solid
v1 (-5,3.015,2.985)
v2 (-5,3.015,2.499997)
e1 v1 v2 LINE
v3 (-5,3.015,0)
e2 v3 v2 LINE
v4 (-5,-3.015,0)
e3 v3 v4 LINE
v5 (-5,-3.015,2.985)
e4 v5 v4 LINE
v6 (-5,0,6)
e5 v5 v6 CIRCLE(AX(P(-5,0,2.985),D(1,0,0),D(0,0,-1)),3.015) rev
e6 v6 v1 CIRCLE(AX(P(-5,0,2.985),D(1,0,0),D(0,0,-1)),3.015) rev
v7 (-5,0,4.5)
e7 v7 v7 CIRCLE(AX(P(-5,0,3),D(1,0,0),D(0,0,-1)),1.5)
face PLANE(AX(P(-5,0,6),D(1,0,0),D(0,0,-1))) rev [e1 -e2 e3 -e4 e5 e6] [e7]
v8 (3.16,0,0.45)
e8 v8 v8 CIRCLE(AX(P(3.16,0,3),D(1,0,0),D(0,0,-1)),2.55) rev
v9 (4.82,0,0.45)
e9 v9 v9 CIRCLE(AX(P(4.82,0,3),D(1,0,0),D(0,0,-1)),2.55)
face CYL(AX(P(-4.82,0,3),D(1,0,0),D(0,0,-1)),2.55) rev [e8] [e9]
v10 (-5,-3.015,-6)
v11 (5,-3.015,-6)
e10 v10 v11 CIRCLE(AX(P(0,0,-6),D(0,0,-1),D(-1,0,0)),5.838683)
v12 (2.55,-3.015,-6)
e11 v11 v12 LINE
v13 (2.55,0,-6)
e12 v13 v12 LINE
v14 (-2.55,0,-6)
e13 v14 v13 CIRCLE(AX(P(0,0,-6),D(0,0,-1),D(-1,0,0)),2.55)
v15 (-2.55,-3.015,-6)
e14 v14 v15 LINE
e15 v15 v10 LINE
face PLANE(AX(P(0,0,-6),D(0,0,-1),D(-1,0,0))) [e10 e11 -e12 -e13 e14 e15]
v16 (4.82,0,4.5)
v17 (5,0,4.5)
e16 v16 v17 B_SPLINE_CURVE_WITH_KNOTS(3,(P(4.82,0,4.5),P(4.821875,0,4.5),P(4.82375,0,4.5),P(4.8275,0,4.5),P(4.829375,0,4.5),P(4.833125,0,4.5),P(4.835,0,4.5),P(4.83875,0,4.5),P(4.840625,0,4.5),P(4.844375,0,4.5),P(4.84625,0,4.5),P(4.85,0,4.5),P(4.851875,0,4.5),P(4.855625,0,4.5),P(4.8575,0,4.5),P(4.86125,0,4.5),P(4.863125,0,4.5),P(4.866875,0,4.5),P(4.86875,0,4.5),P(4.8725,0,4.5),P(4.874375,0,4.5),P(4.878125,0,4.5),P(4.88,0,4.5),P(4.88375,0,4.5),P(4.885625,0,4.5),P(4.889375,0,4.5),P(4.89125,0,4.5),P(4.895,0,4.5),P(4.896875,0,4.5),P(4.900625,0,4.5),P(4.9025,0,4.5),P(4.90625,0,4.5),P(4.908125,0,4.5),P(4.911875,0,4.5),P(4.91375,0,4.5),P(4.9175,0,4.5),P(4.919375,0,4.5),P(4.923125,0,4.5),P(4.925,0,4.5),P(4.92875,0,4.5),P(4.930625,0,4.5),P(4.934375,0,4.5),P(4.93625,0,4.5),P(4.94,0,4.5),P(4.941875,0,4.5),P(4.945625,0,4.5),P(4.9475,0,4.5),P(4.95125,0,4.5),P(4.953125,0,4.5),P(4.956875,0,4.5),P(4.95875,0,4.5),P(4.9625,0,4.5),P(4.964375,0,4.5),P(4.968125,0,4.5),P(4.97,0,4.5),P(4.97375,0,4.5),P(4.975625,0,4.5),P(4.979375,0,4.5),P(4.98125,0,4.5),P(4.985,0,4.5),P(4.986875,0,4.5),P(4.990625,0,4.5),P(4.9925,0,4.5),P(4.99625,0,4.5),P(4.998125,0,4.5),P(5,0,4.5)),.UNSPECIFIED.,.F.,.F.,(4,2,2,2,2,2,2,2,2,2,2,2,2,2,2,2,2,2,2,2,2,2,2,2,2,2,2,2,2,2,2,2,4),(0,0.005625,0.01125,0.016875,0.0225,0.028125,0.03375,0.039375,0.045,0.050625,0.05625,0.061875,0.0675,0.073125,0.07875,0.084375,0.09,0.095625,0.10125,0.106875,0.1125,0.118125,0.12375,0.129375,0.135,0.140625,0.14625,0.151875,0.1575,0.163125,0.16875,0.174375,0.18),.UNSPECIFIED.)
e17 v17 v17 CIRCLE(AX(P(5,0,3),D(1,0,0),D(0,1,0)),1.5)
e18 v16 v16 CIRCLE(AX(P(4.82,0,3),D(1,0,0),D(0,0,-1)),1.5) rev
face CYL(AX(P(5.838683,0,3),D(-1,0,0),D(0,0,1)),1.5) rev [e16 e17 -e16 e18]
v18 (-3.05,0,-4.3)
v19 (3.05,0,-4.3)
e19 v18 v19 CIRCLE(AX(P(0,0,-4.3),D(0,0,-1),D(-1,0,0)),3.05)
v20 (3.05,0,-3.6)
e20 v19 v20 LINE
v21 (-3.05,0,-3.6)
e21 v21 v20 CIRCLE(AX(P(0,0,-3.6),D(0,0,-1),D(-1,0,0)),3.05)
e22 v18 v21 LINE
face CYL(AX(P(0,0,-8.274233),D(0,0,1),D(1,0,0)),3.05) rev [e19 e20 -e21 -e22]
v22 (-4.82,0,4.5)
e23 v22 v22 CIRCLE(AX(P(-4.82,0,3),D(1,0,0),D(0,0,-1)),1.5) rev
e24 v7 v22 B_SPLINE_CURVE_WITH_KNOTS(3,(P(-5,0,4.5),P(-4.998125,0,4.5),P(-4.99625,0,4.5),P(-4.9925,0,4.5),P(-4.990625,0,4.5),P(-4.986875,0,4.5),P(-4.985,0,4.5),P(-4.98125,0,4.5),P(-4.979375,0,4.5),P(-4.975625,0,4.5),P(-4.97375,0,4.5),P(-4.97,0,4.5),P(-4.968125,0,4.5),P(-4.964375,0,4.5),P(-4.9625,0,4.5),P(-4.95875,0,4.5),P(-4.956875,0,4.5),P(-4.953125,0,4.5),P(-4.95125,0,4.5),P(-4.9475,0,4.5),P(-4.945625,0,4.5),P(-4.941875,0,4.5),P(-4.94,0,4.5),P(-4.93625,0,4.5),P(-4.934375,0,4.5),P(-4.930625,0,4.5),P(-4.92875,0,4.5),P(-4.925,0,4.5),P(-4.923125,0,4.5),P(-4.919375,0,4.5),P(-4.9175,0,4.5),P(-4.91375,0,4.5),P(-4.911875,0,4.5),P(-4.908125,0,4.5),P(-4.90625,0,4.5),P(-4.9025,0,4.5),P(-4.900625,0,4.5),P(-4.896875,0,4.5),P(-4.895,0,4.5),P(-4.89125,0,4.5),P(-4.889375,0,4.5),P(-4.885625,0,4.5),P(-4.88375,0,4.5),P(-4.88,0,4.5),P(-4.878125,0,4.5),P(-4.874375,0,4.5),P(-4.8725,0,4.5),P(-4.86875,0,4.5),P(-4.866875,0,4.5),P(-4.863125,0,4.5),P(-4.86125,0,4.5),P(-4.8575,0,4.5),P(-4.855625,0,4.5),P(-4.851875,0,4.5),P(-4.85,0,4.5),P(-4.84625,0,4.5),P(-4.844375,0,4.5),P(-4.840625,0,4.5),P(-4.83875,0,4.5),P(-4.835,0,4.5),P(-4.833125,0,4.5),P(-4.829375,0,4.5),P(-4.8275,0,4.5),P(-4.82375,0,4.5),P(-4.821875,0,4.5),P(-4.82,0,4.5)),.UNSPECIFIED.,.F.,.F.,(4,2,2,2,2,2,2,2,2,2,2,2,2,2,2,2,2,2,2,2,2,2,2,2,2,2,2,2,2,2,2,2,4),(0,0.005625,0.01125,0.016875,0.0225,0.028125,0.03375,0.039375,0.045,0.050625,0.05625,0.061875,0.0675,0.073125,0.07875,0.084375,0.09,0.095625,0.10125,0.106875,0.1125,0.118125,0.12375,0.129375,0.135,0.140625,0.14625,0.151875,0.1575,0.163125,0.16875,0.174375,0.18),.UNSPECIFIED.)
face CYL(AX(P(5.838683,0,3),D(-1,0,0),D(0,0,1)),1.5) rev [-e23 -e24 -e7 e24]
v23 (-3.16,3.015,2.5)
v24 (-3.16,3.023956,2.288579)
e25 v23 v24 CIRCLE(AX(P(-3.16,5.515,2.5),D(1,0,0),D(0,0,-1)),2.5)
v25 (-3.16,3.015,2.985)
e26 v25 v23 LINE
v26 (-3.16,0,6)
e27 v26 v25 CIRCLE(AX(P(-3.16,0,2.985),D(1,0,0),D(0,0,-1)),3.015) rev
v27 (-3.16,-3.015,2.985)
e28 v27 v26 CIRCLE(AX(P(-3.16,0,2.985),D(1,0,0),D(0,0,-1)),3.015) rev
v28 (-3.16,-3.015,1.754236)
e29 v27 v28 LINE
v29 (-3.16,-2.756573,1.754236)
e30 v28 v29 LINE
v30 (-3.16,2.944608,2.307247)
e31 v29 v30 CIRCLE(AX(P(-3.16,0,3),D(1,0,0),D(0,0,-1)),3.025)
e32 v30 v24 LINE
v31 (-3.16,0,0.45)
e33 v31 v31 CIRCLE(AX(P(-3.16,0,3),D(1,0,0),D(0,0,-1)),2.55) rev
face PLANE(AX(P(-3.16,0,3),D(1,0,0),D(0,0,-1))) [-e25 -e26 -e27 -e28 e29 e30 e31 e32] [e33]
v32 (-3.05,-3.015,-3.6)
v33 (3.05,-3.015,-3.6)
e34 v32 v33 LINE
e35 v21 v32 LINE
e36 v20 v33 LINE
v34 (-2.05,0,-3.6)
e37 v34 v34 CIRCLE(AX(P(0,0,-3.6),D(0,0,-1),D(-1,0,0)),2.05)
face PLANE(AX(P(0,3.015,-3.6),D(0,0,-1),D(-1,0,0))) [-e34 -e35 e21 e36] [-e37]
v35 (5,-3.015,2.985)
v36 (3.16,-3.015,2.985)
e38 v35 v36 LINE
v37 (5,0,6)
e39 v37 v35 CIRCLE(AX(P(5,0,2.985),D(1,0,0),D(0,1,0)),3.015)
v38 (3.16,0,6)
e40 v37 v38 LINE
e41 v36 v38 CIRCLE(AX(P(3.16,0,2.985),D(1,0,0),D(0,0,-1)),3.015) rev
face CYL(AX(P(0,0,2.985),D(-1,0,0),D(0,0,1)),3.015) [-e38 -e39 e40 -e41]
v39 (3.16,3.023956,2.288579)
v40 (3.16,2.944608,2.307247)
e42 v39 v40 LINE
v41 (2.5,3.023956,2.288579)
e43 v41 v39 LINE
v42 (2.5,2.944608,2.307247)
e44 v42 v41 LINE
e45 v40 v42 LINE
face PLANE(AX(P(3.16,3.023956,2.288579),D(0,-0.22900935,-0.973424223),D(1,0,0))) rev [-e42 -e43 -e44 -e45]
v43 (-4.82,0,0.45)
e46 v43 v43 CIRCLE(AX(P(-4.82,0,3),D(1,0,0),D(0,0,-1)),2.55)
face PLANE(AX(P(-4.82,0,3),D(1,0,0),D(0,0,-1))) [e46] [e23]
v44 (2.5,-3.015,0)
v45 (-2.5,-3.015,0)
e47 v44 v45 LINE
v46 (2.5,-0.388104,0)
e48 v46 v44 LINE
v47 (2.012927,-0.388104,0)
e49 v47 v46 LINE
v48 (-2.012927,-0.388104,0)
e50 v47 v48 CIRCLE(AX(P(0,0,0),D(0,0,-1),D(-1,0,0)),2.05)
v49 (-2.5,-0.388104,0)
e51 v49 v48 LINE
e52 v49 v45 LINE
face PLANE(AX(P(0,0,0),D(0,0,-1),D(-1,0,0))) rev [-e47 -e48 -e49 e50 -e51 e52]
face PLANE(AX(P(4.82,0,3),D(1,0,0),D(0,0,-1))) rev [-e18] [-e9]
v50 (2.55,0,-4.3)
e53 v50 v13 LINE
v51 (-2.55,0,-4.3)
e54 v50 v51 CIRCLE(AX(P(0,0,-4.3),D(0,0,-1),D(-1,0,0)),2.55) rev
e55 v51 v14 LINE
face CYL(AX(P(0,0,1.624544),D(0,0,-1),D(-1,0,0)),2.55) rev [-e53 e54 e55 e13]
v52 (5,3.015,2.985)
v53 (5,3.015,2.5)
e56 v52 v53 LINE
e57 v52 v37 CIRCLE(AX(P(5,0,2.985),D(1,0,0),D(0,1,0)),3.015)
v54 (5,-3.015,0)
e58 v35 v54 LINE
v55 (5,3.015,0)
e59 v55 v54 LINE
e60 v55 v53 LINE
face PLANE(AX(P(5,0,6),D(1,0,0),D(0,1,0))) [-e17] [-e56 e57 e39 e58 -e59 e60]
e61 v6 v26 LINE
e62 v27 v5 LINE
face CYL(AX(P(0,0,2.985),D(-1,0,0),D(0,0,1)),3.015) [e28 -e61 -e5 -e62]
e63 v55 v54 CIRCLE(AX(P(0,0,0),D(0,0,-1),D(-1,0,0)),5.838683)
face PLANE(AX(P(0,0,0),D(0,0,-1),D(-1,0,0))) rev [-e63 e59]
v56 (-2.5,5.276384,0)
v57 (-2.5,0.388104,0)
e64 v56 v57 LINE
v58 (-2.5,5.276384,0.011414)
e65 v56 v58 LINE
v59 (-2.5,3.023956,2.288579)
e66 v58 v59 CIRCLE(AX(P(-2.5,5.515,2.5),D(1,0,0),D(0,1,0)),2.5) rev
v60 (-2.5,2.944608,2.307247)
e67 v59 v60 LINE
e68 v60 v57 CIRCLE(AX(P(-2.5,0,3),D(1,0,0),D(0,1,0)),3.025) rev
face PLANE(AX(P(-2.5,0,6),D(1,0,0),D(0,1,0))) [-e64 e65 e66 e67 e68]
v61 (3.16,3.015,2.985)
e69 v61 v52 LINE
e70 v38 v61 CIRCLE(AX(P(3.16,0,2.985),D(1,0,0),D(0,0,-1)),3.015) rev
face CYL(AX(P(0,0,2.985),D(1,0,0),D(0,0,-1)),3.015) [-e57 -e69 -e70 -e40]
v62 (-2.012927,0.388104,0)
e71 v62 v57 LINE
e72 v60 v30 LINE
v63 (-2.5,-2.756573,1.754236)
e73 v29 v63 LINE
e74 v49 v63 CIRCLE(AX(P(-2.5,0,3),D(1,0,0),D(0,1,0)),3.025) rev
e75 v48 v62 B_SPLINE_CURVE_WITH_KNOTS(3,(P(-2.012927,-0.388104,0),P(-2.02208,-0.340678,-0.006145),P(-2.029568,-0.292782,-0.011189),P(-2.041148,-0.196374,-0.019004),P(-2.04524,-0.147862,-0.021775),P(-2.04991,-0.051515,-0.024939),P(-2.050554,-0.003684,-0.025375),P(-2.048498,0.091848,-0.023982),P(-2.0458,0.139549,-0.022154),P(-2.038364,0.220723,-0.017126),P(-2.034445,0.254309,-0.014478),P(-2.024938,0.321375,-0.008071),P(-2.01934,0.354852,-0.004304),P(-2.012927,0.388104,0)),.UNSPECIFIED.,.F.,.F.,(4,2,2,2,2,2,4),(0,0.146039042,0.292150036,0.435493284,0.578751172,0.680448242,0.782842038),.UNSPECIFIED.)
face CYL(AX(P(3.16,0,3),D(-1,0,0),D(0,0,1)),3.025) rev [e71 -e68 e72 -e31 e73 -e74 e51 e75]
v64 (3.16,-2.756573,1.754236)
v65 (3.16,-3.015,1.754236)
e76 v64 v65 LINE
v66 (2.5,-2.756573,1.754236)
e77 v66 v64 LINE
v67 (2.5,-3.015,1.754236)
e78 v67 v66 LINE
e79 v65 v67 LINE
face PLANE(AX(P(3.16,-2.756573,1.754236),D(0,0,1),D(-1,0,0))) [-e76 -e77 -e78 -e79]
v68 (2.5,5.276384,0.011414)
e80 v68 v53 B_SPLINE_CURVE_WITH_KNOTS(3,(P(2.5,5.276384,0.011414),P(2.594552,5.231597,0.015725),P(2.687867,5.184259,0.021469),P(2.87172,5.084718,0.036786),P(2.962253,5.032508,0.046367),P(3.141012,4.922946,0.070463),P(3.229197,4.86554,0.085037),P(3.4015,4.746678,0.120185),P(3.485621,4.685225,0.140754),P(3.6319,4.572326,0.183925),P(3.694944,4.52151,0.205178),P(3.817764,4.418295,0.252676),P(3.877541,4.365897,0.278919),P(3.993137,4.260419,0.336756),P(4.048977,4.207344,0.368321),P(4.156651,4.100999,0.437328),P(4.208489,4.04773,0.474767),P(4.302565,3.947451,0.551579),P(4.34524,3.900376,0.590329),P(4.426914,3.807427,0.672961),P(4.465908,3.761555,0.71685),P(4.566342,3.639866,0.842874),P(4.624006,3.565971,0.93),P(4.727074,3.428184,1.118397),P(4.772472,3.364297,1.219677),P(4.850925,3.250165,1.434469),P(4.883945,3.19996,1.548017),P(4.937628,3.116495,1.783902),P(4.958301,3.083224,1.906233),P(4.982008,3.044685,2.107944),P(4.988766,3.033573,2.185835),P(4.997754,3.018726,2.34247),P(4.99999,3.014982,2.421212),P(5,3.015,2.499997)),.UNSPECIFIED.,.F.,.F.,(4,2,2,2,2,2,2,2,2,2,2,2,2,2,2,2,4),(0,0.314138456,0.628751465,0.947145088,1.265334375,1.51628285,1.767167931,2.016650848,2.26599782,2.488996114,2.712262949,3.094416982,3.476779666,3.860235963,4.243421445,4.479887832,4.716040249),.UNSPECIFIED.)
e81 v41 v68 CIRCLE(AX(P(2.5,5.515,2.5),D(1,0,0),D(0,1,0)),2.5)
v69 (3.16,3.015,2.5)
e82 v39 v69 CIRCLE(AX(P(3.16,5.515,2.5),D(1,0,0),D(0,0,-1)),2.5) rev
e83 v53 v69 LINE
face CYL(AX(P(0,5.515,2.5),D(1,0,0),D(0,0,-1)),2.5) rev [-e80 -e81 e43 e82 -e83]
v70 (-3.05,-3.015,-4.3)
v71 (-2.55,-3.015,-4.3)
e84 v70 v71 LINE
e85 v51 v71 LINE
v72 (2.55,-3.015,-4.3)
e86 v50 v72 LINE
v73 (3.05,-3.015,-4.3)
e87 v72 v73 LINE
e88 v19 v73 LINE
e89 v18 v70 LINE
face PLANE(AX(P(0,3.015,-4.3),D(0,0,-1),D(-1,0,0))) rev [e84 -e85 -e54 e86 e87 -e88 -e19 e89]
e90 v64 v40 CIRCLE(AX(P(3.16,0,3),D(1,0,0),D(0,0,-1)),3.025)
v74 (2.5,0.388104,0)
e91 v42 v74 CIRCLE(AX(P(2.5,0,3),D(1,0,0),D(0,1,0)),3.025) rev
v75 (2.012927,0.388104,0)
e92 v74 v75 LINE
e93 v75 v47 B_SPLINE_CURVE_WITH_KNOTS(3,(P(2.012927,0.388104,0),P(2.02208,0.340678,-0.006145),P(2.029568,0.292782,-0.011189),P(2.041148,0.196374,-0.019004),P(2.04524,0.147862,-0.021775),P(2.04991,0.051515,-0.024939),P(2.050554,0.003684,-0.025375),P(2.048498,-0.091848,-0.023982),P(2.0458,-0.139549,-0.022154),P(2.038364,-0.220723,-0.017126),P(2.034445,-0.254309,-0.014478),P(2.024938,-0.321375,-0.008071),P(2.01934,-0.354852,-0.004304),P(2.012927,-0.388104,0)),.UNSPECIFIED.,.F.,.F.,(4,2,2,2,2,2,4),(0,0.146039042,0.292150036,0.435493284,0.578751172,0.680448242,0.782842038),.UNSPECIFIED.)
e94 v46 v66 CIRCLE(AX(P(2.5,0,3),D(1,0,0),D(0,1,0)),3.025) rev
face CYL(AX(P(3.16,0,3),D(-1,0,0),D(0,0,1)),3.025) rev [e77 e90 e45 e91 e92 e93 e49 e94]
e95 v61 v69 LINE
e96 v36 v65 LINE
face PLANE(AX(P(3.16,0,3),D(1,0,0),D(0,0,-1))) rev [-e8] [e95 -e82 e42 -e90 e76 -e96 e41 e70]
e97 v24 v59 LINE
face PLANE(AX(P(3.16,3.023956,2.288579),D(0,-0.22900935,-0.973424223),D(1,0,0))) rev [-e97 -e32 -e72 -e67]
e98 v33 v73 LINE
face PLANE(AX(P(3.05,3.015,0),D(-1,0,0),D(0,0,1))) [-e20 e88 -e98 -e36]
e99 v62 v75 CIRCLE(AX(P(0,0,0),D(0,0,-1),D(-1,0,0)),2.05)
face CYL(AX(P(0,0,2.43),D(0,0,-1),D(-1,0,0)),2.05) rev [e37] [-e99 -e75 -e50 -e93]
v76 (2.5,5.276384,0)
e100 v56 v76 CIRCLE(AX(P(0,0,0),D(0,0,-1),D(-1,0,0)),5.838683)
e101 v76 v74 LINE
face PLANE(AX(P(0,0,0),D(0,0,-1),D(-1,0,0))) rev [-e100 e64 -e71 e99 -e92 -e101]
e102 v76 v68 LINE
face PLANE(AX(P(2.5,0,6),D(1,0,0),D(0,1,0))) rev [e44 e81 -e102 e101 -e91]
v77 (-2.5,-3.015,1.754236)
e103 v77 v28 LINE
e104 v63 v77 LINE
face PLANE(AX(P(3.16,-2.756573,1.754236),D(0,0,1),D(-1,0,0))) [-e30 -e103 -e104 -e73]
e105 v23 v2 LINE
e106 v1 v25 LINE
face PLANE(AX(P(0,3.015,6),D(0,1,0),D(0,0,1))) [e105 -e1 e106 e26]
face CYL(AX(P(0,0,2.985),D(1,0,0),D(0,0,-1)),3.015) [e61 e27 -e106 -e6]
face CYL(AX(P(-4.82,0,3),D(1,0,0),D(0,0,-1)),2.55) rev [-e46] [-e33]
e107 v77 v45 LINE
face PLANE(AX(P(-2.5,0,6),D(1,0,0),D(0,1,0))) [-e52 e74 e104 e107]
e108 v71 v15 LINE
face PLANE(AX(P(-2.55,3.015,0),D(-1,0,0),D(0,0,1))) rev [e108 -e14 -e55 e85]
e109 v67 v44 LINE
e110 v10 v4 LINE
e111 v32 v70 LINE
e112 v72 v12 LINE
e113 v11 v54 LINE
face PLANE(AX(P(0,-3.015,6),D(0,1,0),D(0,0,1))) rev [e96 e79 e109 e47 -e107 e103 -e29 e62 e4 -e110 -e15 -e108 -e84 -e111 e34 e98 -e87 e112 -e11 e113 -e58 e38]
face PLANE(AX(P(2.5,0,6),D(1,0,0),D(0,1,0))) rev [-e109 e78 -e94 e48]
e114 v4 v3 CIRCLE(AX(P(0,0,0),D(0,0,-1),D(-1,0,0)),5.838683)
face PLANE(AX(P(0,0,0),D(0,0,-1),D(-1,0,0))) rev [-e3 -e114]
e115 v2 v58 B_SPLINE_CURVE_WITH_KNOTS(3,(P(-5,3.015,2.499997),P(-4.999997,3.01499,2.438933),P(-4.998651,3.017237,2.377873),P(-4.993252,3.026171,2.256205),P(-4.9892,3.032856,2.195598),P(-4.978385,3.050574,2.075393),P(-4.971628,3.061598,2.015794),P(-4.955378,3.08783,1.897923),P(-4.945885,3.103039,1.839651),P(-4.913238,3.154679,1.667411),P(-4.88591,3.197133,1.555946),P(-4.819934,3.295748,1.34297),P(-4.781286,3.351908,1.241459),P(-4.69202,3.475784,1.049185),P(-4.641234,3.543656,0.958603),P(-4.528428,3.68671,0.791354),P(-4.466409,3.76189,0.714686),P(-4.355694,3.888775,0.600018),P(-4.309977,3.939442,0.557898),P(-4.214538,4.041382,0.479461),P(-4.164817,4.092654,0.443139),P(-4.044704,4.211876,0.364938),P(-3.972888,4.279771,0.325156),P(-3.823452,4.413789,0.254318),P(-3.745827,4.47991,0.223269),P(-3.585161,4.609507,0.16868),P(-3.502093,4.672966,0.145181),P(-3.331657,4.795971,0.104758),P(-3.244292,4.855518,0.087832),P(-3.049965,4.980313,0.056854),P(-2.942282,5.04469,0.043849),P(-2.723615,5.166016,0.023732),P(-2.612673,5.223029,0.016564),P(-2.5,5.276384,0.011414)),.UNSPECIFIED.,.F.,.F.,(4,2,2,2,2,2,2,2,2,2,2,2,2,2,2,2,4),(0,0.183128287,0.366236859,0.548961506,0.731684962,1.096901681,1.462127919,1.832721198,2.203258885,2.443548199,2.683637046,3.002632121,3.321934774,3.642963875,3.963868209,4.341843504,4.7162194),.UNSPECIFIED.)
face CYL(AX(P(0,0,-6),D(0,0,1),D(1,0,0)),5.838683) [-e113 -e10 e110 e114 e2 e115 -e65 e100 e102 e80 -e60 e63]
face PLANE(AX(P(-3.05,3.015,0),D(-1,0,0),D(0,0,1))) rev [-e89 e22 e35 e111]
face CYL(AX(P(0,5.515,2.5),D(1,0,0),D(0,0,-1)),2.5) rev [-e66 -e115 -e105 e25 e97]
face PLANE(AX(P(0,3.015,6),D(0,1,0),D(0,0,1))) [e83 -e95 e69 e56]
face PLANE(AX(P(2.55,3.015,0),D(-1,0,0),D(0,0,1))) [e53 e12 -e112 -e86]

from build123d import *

# Parameters (mm, degrees)
BOSS_EXTRUDE1_DEPTH      = 6
BOSS_EXTRUDE1_2_DEPTH    = 6
SKETCH2_R                = 5.838683498871983
BOSS_EXTRUDE2_DEPTH      = 6
CUT_EXTRUDE1_DEPTH       = 14.695520617658893
CUT_EXTRUDE1_DEPTH_BACK  = 14.695520617658893
SKETCH4_R                = 1.5000000000000004
SKETCH5_W                = 10
SKETCH5_H                = 5.878381978264198
CUT_EXTRUDE2_DEPTH       = 6
CUT_EXTRUDE19_DEPTH      = 11.206882481933452
CUT_EXTRUDE19_DEPTH_BACK = 11.206882481933452
SKETCH31_R               = 1.1
SKETCH33_W               = 5.1
SKETCH33_H               = 1.7000000000000002
CUT_EXTRUDE20_DEPTH      = 6.03
BOSS_EXTRUDE3_DEPTH      = 0.7
BOSS_EXTRUDE4_DEPTH      = 1.7
CUT_EXTRUDE21_START      = 0.7
SKETCH36_R               = 3.05
CUT_EXTRUDE21_DEPTH      = 0.7
SKETCH37_R               = 2.05
CUT_EXTRUDE22_DEPTH      = 6.03
FILLET1_R                = 3.015
FILLET2_R                = 2.5
CUT_EXTRUDE23_DEPTH      = 4.82
CUT_EXTRUDE23_DEPTH_BACK = 4.82
SKETCH39_R               = 2.5500000000000003
CUT_EXTRUDE24_DEPTH      = 3.16
CUT_EXTRUDE24_DEPTH_BACK = 3.16
SKETCH40_R               = 3.025
CHAMFER1_START           = -3.16
CHAMFER1_DEPTH           = 6.32


with BuildPart() as part:
    # Sketch1 → Boss-Extrude1 (new body)
    with BuildSketch(Plane.XY):
        Polygon((-2.4999999999999982, -3.015), (-2.499999999999999, 3.015), (-4.999999999999999, 3.015), (-4.999999999999999, -3.015), align=None)
    extrude(amount=BOSS_EXTRUDE1_DEPTH)



with BuildPart() as body_2:
    # Sketch1 → Boss-Extrude1 2 (new body)
    with BuildSketch(Plane.XY):
        Polygon((5.000000000000001, 3.015), (2.500000000000001, 3.015), (2.5000000000000018, -3.015), (5.000000000000001, -3.015), align=None)
    extrude(amount=BOSS_EXTRUDE1_2_DEPTH)


with BuildPart() as part_1:
    add(part.part)

    add(body_2.part)  # Boss-Extrude2 merges body 2
    # Sketch2 → Boss-Extrude2 (add)
    with BuildSketch(Plane(origin=(0, 0, 0), x_dir=(-1, 0, 0), z_dir=(0, 0, -1))):
        with Locations(Location((0, 0, 0), (0, 0, 148.91002298))):
            Circle(SKETCH2_R)
    extrude(amount=BOSS_EXTRUDE2_DEPTH)

    # Sketch4 → Cut-Extrude1 (cut, two sides: drawn at the far end of the back side and taken through both)
    with BuildSketch(Plane.ZY.offset(4.999999999999999).offset(-CUT_EXTRUDE1_DEPTH_BACK)):
        with Locations((3, 0)):
            Circle(SKETCH4_R)
    extrude(amount=CUT_EXTRUDE1_DEPTH + CUT_EXTRUDE1_DEPTH_BACK, mode=Mode.SUBTRACT)

    # Sketch5 → Cut-Extrude2 (cut)
    with BuildSketch(Plane.XY):
        with Locations((4.4e-16, -5.954190989132099)):
            Rectangle(SKETCH5_W, SKETCH5_H)
    extrude(amount=-CUT_EXTRUDE2_DEPTH, mode=Mode.SUBTRACT)

    # Sketch31 → Cut-Extrude19 (cut, two sides: drawn at the far end of the back side and taken through both)
    with BuildSketch(Plane.XY.offset(-CUT_EXTRUDE19_DEPTH_BACK)):
        Circle(SKETCH31_R)
    extrude(amount=CUT_EXTRUDE19_DEPTH + CUT_EXTRUDE19_DEPTH_BACK, mode=Mode.SUBTRACT)

    # Sketch33 → Cut-Extrude20 (cut)
    with BuildSketch(Plane(origin=(0, -3.015, 0), x_dir=(-1, 0, 0), z_dir=(0, -1, 0))):
        with Locations((-8.9e-16, 5.15)):
            Rectangle(SKETCH33_W, SKETCH33_H)
        Polygon((3.0500000000000056, 4.299999999999999), (2.549999999999999, 4.299999999999999), (-2.5500000000000007, 4.3), (-3.049999999999994, 4.299999999999999), (-3.049999999999994, 3.599999999999999), (3.0500000000000056, 3.6), align=None)
    extrude(amount=-CUT_EXTRUDE20_DEPTH, mode=Mode.SUBTRACT)

    # Sketch34 → Boss-Extrude3 (add)
    with BuildSketch(Plane(origin=(5.1e-16, 0, -3.5999999999999996), x_dir=(-1, 0, -1.4e-16), z_dir=(1.4e-16, 0, -1))):
        with BuildLine():
            ThreePointArc((0.4607331114646439, 3.0150000000000117), (2.313842690198183, 1.9871165051441753), (3.049999999999994, 0))
            Line((3.049999999999994, 0), (3.050000000000006, 3.015))
            Line((3.050000000000006, 3.015), (0.46073311146464313, 3.015))
        make_face()
        with BuildLine():
            Line((-3.0499999999999936, 3.015), (-3.049999999999994, 0))
            ThreePointArc((-3.049999999999994, 3.7e-16), (-2.313842690198182, 1.987116505144176), (-0.46073311146464346, 3.0150000000000117))
            Line((-0.4607331114646427, 3.015), (-3.0499999999999936, 3.015))
        make_face()
    extrude(amount=BOSS_EXTRUDE3_DEPTH)

    # Sketch35 → Boss-Extrude4 (add)
    with BuildSketch(Plane(origin=(0, 0, -6), x_dir=(-1, 0, 0), z_dir=(0, 0, -1))):
        with BuildLine():
            ThreePointArc((-2.550000000000001, -8.2e-16), (-4.1e-16, 2.550000000000001), (2.550000000000001, 0))
            Line((2.5500000000000007, 0), (2.549999999999999, 3.015))
            Line((2.549999999999999, 3.015), (-2.5500000000000007, 3.015))
            Line((-2.5500000000000007, 3.015), (-2.5500000000000007, 0))
        make_face()
    extrude(amount=-BOSS_EXTRUDE4_DEPTH)

    # Sketch36 → Cut-Extrude21 (cut)
    with BuildSketch(Plane.XY.offset(-4.299999999999999).offset(CUT_EXTRUDE21_START)):
        Circle(SKETCH36_R)
    extrude(amount=-CUT_EXTRUDE21_DEPTH, mode=Mode.SUBTRACT)

    # Sketch37 → Cut-Extrude22 (cut)
    with BuildSketch(Plane(origin=(5.1e-16, 0, -3.5999999999999996), x_dir=(-1, 0, -1.4e-16), z_dir=(1.4e-16, 0, -1))):
        Circle(SKETCH37_R)
    extrude(amount=-CUT_EXTRUDE22_DEPTH, mode=Mode.SUBTRACT)

    # Fillet1
    fillet1_edges = [part_1.edges().sort_by_distance(p)[0] for p in [
        (-3.749999999999999, 3.015, 6),
        (-3.7499999999999987, -3.015, 6),
        (3.7500000000000013, -3.015, 6),
        (3.750000000000001, 3.015, 6),
    ]]
    fillet(fillet1_edges, radius=FILLET1_R - 0.0001)  # a hair under: the kernel refuses the full size

    # Fillet2
    # the kernel refuses this fillet: 2.5 mm, written as the material it adds along each edge
    with BuildSketch(Plane(origin=(5.000000000000001, 3.015, 0), x_dir=(0, 1, 0), z_dir=(-1, 0, 0))) as fillet2_piece_1_section:
        with BuildLine():
            CenterArc((FILLET2_R, -FILLET2_R), FILLET2_R, 90, 90)
            Line((-4.4e-16, -FILLET2_R), (0, 0))
            Line((0, 0), (FILLET2_R, 0))
        make_face()
    fillet2_piece_1 = extrude(amount=2.5, mode=Mode.PRIVATE)
    fillet2_piece_1 = fillet2_piece_1 & Plane(origin=(0, 0, 0), x_dir=(0.8563574307404789, 0.5163835307361826, 0), z_dir=(0, 0, 1)) * Cylinder(5.838683498871983, 15, mode=Mode.PRIVATE)
    add(fillet2_piece_1)
    with BuildSketch(Plane(origin=(5.000000000000001, 3.015, 0), x_dir=(0, 1, 0), z_dir=(-1, 0, 0))) as fillet2_piece_2_section:
        with BuildLine():
            CenterArc((FILLET2_R, -FILLET2_R), FILLET2_R, 90, 90)
            Line((-4.4e-16, -FILLET2_R), (0, 0))
            Line((0, 0), (FILLET2_R, 0))
        make_face()
    fillet2_piece_2 = extrude(amount=8.749999999999998, mode=Mode.PRIVATE)
    fillet2_piece_2 = fillet2_piece_2 & Plane(origin=(0, 0, 0), x_dir=(0.8563574307404789, 0.5163835307361826, 0), z_dir=(0, 0, 1)) * Cylinder(5.838683498871983, 28, mode=Mode.PRIVATE)
    fillet2_piece_2 = split(fillet2_piece_2, bisect_by=Plane(origin=(-2.499999999999999, 3.0149999999999992, 0), z_dir=(-1, -1.5e-16, 0)), keep=Keep.TOP, mode=Mode.PRIVATE)
    add(fillet2_piece_2)
    with BuildSketch(Plane(origin=(3.75, 3.015, 0), x_dir=(0, 1, 0), z_dir=(-1, 0, 0))) as fillet2_piece_3_section:
        with BuildLine():
            CenterArc((FILLET2_R, -FILLET2_R), FILLET2_R, 90, 90)
            Line((-4.4e-16, -FILLET2_R), (0, 0))
            Line((0, 0), (FILLET2_R, 0))
        make_face()
    fillet2_piece_3 = extrude(amount=8.75, mode=Mode.PRIVATE)
    fillet2_piece_3 = fillet2_piece_3 & Plane(origin=(0, 0, 0), x_dir=(0.8563574307404789, 0.5163835307361826, 0), z_dir=(0, 0, 1)) * Cylinder(5.838683498871983, 28, mode=Mode.PRIVATE)
    fillet2_piece_3 = split(fillet2_piece_3, bisect_by=Plane(origin=(2.500000000000001, 3.015, 0), z_dir=(1, 1.5e-16, 0)), keep=Keep.TOP, mode=Mode.PRIVATE)
    add(fillet2_piece_3)
    with BuildSketch(Plane(origin=(-2.499999999999999, 3.015, 0), x_dir=(0, 1, 0), z_dir=(-1, 0, 0))) as fillet2_piece_4_section:
        with BuildLine():
            CenterArc((FILLET2_R, -FILLET2_R), FILLET2_R, 90, 90)
            Line((-4.4e-16, -FILLET2_R), (0, 0))
            Line((0, 0), (FILLET2_R, 0))
        make_face()
    fillet2_piece_4 = extrude(amount=2.5, mode=Mode.PRIVATE)
    fillet2_piece_4 = fillet2_piece_4 & Plane(origin=(0, 0, 0), x_dir=(0.8563574307404789, 0.5163835307361826, 0), z_dir=(0, 0, 1)) * Cylinder(5.838683498871983, 15, mode=Mode.PRIVATE)
    add(fillet2_piece_4)

    # Sketch39 → Cut-Extrude23 (cut, two sides: drawn at the far end of the back side and taken through both)
    with BuildSketch(Plane(origin=(0, 0, 0), x_dir=(0, 0, -1), z_dir=(1, 0, 0)).offset(-CUT_EXTRUDE23_DEPTH_BACK)):
        with Locations((-3, 0)):
            Circle(SKETCH39_R)
    extrude(amount=CUT_EXTRUDE23_DEPTH + CUT_EXTRUDE23_DEPTH_BACK, mode=Mode.SUBTRACT)

    # Sketch40 → Cut-Extrude24 (cut, two sides: drawn at the far end of the back side and taken through both)
    with BuildSketch(Plane(origin=(0, 0, 0), x_dir=(0, 0, -1), z_dir=(1, 0, 0)).offset(-CUT_EXTRUDE24_DEPTH_BACK)):
        with Locations((-3, 0)):
            Circle(SKETCH40_R)
    extrude(amount=CUT_EXTRUDE24_DEPTH + CUT_EXTRUDE24_DEPTH_BACK, mode=Mode.SUBTRACT)

    # Chamfer1: read off the stored shape, not the designer's step
    # Chamfer1 outline → Chamfer1 (cut)
    with BuildSketch(Plane.YZ.offset(CHAMFER1_START)):
        with BuildLine():
            ThreePointArc((3.015, 2.754235885), (2.988173778, 2.529423252), (2.944608274, 2.307246717))
            Line((2.944608274, 2.307246717), (3.023955784, 2.288579294))
            ThreePointArc((3.023955784, 2.288579294), (3.01723995, 2.394194848), (3.015, 2.5))
            Line((3.015, 2.5), (3.015, 2.754235885))
        make_face()
        with BuildLine():
            Line((-3.015, 1.754235885), (-2.756573375, 1.754235885))
            ThreePointArc((-2.756573375, 1.754235885), (-2.928782137, 2.243124716), (-3.015, 2.754235885))
            Line((-3.015, 2.754235885), (-3.015, 1.754235885))
        make_face()
    extrude(amount=CHAMFER1_DEPTH, mode=Mode.SUBTRACT)


solid = part_1.part
